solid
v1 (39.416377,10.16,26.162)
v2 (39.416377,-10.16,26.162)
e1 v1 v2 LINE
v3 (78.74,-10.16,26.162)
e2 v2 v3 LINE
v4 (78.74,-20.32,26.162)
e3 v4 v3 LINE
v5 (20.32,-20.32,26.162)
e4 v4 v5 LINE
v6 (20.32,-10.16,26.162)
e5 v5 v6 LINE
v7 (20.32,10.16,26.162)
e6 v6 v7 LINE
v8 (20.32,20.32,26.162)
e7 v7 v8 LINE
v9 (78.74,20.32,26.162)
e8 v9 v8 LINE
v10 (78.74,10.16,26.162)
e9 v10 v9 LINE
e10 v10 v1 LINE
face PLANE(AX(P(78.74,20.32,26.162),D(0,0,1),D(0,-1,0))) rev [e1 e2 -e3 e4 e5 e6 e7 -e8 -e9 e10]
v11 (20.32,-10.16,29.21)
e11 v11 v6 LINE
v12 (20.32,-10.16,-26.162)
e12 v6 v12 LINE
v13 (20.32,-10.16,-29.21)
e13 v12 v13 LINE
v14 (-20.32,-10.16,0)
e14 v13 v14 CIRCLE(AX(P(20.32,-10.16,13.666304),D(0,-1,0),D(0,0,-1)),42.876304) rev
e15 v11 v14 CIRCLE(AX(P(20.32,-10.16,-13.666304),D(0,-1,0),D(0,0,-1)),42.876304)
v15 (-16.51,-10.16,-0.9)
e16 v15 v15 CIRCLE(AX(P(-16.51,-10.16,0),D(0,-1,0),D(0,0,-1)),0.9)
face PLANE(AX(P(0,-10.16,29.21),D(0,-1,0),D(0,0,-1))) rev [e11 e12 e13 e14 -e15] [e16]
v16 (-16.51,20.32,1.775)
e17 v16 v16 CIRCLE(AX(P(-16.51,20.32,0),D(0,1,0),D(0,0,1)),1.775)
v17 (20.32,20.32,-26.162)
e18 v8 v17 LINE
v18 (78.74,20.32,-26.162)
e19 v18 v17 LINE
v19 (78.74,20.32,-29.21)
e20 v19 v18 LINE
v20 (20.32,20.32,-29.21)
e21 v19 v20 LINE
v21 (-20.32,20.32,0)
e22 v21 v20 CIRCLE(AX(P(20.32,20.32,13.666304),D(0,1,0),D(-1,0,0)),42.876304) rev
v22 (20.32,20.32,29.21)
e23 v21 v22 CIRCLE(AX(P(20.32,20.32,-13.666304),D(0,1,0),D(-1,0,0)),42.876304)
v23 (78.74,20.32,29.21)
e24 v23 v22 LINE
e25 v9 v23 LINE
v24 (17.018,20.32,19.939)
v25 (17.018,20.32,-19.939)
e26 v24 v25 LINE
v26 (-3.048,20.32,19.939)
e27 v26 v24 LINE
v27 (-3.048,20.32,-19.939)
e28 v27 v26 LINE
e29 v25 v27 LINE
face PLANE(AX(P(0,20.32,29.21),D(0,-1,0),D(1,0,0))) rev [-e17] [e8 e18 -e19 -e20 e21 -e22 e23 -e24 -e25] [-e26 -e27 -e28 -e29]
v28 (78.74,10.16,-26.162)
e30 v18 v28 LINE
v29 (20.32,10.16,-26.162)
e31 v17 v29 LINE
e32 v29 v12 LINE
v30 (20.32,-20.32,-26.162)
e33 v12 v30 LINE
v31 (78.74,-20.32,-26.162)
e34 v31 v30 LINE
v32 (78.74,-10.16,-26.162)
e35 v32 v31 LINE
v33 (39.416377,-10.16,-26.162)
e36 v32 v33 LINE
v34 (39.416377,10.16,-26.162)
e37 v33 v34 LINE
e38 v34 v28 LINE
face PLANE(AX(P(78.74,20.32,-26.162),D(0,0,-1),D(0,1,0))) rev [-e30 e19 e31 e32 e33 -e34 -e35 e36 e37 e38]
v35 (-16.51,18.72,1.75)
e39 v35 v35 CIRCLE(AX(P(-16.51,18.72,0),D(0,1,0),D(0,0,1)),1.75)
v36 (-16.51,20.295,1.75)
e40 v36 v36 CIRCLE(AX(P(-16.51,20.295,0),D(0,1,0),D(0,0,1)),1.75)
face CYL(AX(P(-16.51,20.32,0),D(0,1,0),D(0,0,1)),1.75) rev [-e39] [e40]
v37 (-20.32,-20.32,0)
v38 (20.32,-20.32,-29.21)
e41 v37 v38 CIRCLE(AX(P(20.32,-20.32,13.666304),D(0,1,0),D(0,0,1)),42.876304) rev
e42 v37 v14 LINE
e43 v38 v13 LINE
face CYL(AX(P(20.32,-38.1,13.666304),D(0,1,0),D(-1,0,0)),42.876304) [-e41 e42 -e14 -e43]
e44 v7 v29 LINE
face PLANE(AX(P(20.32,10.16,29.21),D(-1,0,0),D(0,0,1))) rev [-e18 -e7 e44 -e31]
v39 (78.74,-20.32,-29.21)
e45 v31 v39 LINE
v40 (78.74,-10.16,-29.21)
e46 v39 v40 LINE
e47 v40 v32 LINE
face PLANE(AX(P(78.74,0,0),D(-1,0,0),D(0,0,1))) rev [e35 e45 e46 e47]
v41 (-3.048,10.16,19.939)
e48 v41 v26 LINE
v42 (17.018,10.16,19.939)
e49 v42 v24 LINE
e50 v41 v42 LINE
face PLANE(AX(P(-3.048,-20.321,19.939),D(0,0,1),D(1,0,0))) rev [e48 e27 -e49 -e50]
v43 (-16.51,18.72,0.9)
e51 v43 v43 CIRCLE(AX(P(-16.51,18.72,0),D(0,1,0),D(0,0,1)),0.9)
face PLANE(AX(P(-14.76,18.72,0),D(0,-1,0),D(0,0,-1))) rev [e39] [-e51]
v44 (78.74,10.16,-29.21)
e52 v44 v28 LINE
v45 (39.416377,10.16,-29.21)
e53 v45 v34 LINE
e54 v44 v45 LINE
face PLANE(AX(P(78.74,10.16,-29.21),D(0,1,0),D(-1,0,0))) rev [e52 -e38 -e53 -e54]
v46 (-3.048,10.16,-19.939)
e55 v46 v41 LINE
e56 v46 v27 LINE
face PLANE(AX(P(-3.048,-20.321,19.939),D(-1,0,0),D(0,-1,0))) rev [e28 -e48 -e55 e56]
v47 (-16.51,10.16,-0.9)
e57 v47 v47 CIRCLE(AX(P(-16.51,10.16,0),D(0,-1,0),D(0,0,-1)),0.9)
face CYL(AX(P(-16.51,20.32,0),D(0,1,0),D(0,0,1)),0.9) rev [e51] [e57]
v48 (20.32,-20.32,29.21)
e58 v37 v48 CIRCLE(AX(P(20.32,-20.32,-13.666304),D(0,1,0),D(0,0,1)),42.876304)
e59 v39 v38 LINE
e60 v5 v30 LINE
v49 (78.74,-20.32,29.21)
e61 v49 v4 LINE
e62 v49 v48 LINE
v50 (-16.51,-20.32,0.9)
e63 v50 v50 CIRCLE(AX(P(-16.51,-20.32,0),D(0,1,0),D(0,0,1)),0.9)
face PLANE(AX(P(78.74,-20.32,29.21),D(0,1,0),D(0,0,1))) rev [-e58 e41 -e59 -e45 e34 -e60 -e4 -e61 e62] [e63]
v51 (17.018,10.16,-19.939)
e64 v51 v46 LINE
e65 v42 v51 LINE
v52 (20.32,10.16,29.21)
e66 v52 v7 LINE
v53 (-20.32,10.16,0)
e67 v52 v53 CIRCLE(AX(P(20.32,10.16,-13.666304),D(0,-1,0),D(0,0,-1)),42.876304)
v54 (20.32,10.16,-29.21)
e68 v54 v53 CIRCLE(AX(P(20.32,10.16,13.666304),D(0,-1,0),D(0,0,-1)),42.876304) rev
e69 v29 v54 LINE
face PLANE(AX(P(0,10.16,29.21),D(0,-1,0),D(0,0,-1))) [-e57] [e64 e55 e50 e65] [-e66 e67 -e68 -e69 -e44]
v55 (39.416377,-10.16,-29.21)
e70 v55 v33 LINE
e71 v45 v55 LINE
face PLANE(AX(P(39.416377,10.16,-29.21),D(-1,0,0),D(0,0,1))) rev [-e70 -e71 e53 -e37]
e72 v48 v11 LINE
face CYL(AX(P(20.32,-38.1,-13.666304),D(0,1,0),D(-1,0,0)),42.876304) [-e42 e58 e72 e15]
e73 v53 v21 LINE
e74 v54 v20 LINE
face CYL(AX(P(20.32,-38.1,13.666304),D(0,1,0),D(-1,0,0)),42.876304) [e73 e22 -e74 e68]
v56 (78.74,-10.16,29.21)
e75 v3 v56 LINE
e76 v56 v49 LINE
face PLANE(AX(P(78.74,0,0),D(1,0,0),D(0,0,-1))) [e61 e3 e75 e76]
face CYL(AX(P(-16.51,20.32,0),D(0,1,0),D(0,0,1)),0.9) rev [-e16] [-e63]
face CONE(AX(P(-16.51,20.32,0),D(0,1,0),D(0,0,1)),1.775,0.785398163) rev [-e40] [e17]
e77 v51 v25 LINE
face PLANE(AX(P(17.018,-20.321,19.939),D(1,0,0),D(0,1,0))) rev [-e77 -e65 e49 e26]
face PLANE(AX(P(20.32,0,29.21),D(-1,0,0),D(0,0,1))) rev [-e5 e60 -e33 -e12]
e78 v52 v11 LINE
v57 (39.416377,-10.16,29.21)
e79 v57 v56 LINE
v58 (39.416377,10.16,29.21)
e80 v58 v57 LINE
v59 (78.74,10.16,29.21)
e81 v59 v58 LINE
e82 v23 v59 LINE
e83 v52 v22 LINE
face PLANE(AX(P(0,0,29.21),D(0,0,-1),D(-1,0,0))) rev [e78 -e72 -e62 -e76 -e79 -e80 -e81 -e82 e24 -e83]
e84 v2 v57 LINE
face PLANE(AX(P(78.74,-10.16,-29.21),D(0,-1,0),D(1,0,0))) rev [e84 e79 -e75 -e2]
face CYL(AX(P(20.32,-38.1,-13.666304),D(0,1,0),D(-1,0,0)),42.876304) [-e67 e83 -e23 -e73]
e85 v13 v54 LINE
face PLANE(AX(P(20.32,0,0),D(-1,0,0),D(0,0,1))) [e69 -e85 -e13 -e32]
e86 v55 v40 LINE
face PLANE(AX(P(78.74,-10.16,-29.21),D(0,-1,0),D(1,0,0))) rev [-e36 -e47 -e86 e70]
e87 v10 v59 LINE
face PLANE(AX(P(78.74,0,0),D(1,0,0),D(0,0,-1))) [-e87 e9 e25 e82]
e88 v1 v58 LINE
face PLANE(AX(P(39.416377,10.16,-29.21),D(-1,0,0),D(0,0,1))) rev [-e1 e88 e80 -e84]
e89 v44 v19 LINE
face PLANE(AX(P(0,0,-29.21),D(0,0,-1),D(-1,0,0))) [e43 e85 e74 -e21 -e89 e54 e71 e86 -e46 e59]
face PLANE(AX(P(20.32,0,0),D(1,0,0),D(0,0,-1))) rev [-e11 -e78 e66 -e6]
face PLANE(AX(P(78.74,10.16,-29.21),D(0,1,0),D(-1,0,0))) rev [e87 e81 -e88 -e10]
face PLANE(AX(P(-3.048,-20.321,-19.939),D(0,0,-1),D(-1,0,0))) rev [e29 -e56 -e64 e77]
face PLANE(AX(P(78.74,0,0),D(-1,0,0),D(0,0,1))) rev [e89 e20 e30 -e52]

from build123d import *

# Parameters (mm, degrees)
SKETCH1_W           = 20.32
SKETCH1_H           = 10.16
BOSS_EXTRUDE1_DEPTH = 29.21
SKETCH1_4_W         = 40.64
SKETCH1_4_H         = 10.16
BOSS_EXTRUDE2_DEPTH = 29.21
SKETCH5_W           = 3.048
SKETCH5_H           = 40.64
BOSS_EXTRUDE4_DEPTH = 58.42
SKETCH10_W          = 39.323622634
SKETCH10_H          = 20.32
CUT_EXTRUDE2_DEPTH  = 101.12884899
CUT_EXTRUDE4_DEPTH  = 58.42
CUT_EXTRUDE5_REACH  = 95.3
SKETCH13_W          = 20.066
SKETCH13_H          = 39.878


with BuildPart() as part:
    # Sketch1 → Boss-Extrude1 (new, symmetric)
    with BuildSketch(Plane.XY):
        with Locations((-10.16, 15.24)):
            Rectangle(SKETCH1_W, SKETCH1_H)
    boss_extrude1 = extrude(amount=BOSS_EXTRUDE1_DEPTH, both=True)

    # Mirror1: Boss-Extrude1 across plane
    add(boss_extrude1.mirror(Plane(origin=(0, 0, 0), x_dir=(0, 0, 1), z_dir=(1, 0, 0))))



with BuildPart() as body_2:
    # Sketch1<4> → Boss-Extrude2 (new, symmetric)
    with BuildSketch(Plane.XY):
        with Locations((0, -15.24)):
            Rectangle(SKETCH1_4_W, SKETCH1_4_H)
    extrude(amount=BOSS_EXTRUDE2_DEPTH, both=True)


with BuildPart() as part_1:
    add(part.part)

    add(body_2.part)  # Boss-Extrude4 merges body 2
    # Sketch5 → Boss-Extrude4 (add)
    with BuildSketch(Plane(origin=(20.32, 0, 0), x_dir=(0, 0, -1), z_dir=(1, 0, 0))):
        with Locations((-27.686, 0)):
            Rectangle(SKETCH5_W, SKETCH5_H)
        with Locations((27.686, 0)):
            Rectangle(SKETCH5_W, SKETCH5_H)
    extrude(amount=BOSS_EXTRUDE4_DEPTH)

    # Sketch8 → CBORE for M1.6 SHCS1 (revolve, cut)
    with BuildSketch(Plane(origin=(-16.51, 20.32, 0), x_dir=(0, 0, 1), z_dir=(1, 0, 0))):
        Polygon((0, 0), (0, 40.64), (0.9, 40.64), (0.9, 1.6), (1.75, 1.6), (1.75, 0.025), (1.775, 0), align=None)
    revolve(axis=Axis((-16.51, 26.67, 0), (0, -1, 0)), mode=Mode.SUBTRACT)

    # Sketch10 → Cut-Extrude2 (cut, through all)
    with BuildSketch(Plane.XY.offset(29.21)):
        with Locations((59.078188683, 0)):
            Rectangle(SKETCH10_W, SKETCH10_H)
    extrude(amount=-CUT_EXTRUDE2_DEPTH, mode=Mode.SUBTRACT)

    # Sketch12 → Cut-Extrude4 (cut)
    with BuildSketch(Plane(origin=(0, 20.32, 0), x_dir=(1, 0, 0), z_dir=(0, 1, 0))):
        with BuildLine():
            Line((-20.32, 29.21), (-20.32, 0))
            ThreePointArc((-20.32, 0), (-4.704156829, 21.149913849), (20.32, 29.21))
            Line((20.32, 29.21), (-20.32, 29.21))
        make_face()
        with BuildLine():
            Line((-20.32, 0), (-20.32, -29.21))
            Line((-20.32, -29.21), (20.32, -29.21))
            ThreePointArc((20.32, -29.21), (-4.704156829, -21.149913849), (-20.32, 0))
        make_face()
    extrude(amount=-CUT_EXTRUDE4_DEPTH, mode=Mode.SUBTRACT)

    # Sketch13 → Cut-Extrude5 (cut, up to next)
    with BuildSketch(Plane(origin=(0, 20.32, 0), x_dir=(1, 0, 0), z_dir=(0, 1, 0)), mode=Mode.PRIVATE) as cut_extrude5_sk1:
        with Locations((6.985, 0)):
            Rectangle(SKETCH13_W, SKETCH13_H)
    cut_extrude5_tool1 = extrude(cut_extrude5_sk1.sketch, amount=-CUT_EXTRUDE5_REACH, mode=Mode.PRIVATE) & part_1.part
    add(cut_extrude5_tool1.solids().sort_by_distance((6.985, 20.32, 0))[0], mode=Mode.SUBTRACT)


solid = part_1.part
